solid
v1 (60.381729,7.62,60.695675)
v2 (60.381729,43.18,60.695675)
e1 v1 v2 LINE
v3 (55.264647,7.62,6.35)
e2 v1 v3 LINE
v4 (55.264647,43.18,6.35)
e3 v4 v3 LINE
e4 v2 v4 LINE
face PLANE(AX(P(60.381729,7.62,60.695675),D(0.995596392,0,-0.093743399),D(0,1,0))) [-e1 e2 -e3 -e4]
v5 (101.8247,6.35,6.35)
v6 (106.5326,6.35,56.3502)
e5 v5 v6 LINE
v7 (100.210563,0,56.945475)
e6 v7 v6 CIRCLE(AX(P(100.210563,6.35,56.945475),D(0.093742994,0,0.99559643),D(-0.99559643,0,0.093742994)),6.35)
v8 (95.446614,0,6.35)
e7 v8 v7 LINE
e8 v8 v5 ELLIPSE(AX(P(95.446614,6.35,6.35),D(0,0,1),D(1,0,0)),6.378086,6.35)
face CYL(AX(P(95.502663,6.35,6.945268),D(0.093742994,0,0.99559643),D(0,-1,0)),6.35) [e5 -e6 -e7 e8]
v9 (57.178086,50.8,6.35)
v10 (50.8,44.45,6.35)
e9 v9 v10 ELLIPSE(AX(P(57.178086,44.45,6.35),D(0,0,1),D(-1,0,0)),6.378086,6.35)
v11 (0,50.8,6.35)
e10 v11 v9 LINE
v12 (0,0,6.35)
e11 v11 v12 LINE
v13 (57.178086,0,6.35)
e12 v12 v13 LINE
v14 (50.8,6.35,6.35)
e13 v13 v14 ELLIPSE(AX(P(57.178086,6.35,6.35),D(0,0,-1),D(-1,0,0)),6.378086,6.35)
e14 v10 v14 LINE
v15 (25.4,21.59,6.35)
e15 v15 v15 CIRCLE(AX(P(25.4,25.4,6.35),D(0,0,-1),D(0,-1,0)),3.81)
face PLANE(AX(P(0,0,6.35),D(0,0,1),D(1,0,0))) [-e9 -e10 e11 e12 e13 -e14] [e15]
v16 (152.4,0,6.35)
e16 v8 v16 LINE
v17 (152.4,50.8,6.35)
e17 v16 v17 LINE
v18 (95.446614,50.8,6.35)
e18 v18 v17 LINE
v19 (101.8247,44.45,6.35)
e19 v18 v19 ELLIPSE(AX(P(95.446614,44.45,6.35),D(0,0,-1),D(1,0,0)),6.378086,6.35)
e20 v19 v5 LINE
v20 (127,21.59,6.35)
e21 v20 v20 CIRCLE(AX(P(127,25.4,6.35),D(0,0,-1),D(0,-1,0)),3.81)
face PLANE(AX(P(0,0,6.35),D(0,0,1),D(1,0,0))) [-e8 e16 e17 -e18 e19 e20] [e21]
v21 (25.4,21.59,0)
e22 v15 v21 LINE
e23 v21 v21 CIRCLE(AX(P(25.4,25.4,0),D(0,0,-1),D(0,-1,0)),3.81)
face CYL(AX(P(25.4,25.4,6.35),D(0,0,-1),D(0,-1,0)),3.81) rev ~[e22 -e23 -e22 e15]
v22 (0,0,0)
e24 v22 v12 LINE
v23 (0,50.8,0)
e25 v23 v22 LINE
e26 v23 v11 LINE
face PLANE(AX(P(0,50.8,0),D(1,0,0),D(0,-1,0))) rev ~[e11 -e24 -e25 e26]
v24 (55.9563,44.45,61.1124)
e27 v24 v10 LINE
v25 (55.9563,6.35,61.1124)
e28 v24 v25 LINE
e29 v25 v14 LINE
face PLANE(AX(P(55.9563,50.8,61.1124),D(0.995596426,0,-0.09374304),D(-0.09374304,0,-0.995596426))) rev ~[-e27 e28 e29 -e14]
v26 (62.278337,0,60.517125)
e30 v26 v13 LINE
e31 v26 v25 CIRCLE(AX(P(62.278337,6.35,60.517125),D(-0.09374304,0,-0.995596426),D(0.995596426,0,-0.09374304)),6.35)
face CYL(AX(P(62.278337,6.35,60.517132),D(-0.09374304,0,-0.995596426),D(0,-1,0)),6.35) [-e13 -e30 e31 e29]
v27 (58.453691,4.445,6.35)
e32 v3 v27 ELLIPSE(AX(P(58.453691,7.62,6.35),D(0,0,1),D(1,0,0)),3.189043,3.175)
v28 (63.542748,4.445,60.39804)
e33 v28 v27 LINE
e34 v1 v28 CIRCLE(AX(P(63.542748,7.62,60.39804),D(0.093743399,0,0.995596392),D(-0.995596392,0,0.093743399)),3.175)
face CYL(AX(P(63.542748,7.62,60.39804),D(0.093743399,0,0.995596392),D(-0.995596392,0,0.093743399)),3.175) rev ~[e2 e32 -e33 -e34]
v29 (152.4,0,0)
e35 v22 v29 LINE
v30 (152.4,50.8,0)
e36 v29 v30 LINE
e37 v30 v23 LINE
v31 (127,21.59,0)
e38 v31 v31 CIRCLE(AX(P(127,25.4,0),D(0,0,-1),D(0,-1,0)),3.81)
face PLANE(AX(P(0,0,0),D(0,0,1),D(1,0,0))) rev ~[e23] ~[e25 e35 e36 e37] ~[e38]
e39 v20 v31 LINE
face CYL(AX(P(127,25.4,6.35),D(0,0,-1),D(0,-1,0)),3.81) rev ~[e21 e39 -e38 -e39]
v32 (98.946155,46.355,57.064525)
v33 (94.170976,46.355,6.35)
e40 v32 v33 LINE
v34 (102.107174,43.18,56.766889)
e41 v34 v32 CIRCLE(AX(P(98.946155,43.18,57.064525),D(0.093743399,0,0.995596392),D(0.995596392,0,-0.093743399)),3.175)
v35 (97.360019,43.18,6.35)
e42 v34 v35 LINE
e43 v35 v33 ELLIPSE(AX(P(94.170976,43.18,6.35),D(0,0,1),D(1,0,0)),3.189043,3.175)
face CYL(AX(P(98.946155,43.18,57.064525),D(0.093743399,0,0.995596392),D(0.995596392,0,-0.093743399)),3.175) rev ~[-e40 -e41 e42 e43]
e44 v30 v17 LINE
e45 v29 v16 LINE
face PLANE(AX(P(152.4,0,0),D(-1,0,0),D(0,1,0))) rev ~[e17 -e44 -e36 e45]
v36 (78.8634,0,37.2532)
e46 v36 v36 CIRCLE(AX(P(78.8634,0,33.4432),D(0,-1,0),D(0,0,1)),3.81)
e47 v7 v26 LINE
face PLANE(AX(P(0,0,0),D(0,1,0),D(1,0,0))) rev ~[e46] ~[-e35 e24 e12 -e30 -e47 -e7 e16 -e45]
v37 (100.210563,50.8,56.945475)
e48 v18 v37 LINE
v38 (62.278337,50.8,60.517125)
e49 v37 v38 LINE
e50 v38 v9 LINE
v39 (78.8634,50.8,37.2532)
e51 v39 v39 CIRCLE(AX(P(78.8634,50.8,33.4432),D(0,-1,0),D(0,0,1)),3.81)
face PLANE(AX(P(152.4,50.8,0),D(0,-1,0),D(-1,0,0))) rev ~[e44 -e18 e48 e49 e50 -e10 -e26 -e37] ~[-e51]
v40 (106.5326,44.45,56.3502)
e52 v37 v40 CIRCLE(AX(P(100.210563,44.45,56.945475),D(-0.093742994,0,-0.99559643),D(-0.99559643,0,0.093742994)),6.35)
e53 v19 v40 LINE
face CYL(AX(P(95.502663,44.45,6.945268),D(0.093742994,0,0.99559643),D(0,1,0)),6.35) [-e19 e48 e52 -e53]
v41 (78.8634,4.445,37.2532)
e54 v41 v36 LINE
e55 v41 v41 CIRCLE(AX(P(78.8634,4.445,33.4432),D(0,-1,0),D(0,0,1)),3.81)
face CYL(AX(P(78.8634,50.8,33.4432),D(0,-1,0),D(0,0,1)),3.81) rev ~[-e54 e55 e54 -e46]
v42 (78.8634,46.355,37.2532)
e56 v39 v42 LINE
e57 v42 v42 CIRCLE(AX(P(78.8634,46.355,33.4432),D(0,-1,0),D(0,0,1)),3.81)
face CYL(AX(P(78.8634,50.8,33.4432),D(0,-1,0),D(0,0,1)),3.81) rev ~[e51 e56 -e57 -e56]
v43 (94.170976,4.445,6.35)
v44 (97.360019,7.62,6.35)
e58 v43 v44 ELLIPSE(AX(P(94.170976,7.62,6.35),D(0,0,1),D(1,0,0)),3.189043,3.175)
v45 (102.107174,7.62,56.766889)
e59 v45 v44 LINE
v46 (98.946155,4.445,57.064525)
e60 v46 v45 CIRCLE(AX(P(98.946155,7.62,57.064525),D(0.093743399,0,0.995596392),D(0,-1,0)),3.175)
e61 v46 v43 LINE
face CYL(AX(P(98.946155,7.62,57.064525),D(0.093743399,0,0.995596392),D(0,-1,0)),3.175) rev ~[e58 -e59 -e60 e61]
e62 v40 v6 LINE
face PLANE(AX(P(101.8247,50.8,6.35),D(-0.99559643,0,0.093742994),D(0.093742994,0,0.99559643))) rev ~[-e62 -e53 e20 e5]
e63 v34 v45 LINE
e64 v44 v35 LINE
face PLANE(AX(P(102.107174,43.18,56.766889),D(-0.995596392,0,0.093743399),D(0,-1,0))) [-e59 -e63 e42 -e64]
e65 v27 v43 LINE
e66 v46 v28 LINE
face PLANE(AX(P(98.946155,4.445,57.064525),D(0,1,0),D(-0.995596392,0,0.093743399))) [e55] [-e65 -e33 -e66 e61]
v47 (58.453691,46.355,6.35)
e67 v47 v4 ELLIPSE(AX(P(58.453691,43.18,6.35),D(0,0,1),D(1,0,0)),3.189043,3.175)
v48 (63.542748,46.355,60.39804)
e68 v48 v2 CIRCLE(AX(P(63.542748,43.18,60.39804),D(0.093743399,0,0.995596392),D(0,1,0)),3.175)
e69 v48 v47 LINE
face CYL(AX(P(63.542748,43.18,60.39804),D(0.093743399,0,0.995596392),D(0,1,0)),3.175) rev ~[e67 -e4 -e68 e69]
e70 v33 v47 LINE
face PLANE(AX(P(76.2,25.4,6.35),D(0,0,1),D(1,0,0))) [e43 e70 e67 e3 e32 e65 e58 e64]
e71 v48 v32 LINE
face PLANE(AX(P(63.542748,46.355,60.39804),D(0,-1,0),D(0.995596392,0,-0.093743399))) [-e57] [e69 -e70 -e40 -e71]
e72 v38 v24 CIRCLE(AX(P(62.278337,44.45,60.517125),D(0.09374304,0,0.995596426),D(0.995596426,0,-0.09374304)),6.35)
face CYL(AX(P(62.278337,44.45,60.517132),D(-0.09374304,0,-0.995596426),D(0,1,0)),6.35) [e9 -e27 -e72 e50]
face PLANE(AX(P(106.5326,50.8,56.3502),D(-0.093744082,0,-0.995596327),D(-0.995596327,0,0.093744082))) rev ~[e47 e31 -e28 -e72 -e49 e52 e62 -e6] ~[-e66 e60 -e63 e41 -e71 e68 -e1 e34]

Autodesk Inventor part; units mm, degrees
ref_plane "YZ Plane" through (0, 0, 0) normal (1, 0, 0) x (0, 1, 0)
ref_plane "XZ Plane" through (0, 0, 0) normal (0, 1, 0) x (-1, 0, 0)
ref_plane "XY Plane" through (0, 0, 0) normal (0, 0, 1) x (1, 0, 0)
sketch "Sketch1" plane through (0, 0, 0) normal (0, 0, 1) x (1, 0, 0)
  line L0 (0, 0) -> (152.4, 0)
  line L1 (152.4, 0) -> (152.4, 50.8)
  line L2 (152.4, 50.8) -> (0, 50.8)
  line L3 (0, 50.8) -> (0, 0)
  dimension "d0" = 50.8
  dimension "d1" = 152.4
extrude "Extrusion1" add sketch "Sketch1" along normal blind 6.35
sketch "Sketch2" plane through (0, 0, 6.35) normal (0, 0, 1) x (1, 0, 0)
  line L0 (0, 0) -> (0, 50.8) projected
  line L1 (152.4, 50.8) -> (152.4, 0) projected
  point P0 (25.4, 25.4)
  point P1 (127, 25.4)
  point P2 (0, 25.4)
  dimension "d4" = 25.4
  dimension "d5" = 25.4
hole "Hole1" at (25.4, 25.4, 6.35) at (127, 25.4, 6.35) direction (0, 0, -1) diameter 7.62 end through all
sketch "Sketch3" plane through (0, 50.8, 0) normal (0, 1, 0) x (1, 0, 0)
  line L0 (0, -6.35) -> (152.4, -6.35) projected
  line L1 (0, 0) -> (0, -6.35) projected
  line L2 (101.8247, -6.35) -> (106.5326, -56.3502)
  line L3 (106.5326, -56.3502) -> (55.9563, -61.1124)
  line L4 (55.9563, -61.1124) -> (50.8, -6.35)
  dimension "d13" = 50.8
  dimension "d14" = 50.8
  dimension "d15" = 54.7624
  dimension "d16" = 5.379
extrude "Extrusion2" add sketch "Sketch3" against normal up to surface (50.8 mm away)
sketch "Sketch4" plane through (106.5326, 0, 56.3502) normal (0.0937434, 0, 0.9955964) x (0.9955964, 0, -0.0937434)
  line L0 (-50.8, 50.8) -> (0, 50.8) projected
  line L1 (-50.8, 50.8) -> (-50.8, 0) projected
  line L2 (-43.18, 46.355) -> (-7.62, 46.355)
  line L3 (-4.445, 43.18) -> (-4.445, 7.62)
  line L4 (-7.62, 4.445) -> (-43.18, 4.445)
  line L5 (-46.355, 7.62) -> (-46.355, 43.18)
  arc A0 (-43.18, 46.355) -> (-46.355, 43.18) centre (-43.18, 43.18) ccw
  arc A1 (-46.355, 7.62) -> (-43.18, 4.445) centre (-43.18, 7.62) ccw
  arc A2 (-7.62, 4.445) -> (-4.445, 7.62) centre (-7.62, 7.62) ccw
  arc A3 (-4.445, 43.18) -> (-7.62, 46.355) centre (-7.62, 43.18) ccw
  point P0 (-100.781, 0)
  point P1 (-25.4, 46.355)
  point P2 (-25.4, 50.8)
  point P3 (-46.355, 25.4)
  point P4 (-50.8, 25.4)
  dimension "d19" = 3.175
  dimension "d20" = 4.445
  dimension "d21" = 4.445
extrude "Extrusion3" cut sketch "Sketch4" against normal up to surface surface through (76.2, 25.4, 6.35) normal (0, 0, 1)
fillet "Fillet1" radius 6.35 4 edges at (53.3782, 50.8, 33.7312) (53.3782, 0, 33.7312) (104.1787, 50.8, 31.3501) (104.1787, 0, 31.3501)
hole "Hole2" at (78.8634, 50.8, 33.4432) direction (0, -1, 0) diameter 7.62 end through all
properties part number "short frame bracket" material "Steel"
